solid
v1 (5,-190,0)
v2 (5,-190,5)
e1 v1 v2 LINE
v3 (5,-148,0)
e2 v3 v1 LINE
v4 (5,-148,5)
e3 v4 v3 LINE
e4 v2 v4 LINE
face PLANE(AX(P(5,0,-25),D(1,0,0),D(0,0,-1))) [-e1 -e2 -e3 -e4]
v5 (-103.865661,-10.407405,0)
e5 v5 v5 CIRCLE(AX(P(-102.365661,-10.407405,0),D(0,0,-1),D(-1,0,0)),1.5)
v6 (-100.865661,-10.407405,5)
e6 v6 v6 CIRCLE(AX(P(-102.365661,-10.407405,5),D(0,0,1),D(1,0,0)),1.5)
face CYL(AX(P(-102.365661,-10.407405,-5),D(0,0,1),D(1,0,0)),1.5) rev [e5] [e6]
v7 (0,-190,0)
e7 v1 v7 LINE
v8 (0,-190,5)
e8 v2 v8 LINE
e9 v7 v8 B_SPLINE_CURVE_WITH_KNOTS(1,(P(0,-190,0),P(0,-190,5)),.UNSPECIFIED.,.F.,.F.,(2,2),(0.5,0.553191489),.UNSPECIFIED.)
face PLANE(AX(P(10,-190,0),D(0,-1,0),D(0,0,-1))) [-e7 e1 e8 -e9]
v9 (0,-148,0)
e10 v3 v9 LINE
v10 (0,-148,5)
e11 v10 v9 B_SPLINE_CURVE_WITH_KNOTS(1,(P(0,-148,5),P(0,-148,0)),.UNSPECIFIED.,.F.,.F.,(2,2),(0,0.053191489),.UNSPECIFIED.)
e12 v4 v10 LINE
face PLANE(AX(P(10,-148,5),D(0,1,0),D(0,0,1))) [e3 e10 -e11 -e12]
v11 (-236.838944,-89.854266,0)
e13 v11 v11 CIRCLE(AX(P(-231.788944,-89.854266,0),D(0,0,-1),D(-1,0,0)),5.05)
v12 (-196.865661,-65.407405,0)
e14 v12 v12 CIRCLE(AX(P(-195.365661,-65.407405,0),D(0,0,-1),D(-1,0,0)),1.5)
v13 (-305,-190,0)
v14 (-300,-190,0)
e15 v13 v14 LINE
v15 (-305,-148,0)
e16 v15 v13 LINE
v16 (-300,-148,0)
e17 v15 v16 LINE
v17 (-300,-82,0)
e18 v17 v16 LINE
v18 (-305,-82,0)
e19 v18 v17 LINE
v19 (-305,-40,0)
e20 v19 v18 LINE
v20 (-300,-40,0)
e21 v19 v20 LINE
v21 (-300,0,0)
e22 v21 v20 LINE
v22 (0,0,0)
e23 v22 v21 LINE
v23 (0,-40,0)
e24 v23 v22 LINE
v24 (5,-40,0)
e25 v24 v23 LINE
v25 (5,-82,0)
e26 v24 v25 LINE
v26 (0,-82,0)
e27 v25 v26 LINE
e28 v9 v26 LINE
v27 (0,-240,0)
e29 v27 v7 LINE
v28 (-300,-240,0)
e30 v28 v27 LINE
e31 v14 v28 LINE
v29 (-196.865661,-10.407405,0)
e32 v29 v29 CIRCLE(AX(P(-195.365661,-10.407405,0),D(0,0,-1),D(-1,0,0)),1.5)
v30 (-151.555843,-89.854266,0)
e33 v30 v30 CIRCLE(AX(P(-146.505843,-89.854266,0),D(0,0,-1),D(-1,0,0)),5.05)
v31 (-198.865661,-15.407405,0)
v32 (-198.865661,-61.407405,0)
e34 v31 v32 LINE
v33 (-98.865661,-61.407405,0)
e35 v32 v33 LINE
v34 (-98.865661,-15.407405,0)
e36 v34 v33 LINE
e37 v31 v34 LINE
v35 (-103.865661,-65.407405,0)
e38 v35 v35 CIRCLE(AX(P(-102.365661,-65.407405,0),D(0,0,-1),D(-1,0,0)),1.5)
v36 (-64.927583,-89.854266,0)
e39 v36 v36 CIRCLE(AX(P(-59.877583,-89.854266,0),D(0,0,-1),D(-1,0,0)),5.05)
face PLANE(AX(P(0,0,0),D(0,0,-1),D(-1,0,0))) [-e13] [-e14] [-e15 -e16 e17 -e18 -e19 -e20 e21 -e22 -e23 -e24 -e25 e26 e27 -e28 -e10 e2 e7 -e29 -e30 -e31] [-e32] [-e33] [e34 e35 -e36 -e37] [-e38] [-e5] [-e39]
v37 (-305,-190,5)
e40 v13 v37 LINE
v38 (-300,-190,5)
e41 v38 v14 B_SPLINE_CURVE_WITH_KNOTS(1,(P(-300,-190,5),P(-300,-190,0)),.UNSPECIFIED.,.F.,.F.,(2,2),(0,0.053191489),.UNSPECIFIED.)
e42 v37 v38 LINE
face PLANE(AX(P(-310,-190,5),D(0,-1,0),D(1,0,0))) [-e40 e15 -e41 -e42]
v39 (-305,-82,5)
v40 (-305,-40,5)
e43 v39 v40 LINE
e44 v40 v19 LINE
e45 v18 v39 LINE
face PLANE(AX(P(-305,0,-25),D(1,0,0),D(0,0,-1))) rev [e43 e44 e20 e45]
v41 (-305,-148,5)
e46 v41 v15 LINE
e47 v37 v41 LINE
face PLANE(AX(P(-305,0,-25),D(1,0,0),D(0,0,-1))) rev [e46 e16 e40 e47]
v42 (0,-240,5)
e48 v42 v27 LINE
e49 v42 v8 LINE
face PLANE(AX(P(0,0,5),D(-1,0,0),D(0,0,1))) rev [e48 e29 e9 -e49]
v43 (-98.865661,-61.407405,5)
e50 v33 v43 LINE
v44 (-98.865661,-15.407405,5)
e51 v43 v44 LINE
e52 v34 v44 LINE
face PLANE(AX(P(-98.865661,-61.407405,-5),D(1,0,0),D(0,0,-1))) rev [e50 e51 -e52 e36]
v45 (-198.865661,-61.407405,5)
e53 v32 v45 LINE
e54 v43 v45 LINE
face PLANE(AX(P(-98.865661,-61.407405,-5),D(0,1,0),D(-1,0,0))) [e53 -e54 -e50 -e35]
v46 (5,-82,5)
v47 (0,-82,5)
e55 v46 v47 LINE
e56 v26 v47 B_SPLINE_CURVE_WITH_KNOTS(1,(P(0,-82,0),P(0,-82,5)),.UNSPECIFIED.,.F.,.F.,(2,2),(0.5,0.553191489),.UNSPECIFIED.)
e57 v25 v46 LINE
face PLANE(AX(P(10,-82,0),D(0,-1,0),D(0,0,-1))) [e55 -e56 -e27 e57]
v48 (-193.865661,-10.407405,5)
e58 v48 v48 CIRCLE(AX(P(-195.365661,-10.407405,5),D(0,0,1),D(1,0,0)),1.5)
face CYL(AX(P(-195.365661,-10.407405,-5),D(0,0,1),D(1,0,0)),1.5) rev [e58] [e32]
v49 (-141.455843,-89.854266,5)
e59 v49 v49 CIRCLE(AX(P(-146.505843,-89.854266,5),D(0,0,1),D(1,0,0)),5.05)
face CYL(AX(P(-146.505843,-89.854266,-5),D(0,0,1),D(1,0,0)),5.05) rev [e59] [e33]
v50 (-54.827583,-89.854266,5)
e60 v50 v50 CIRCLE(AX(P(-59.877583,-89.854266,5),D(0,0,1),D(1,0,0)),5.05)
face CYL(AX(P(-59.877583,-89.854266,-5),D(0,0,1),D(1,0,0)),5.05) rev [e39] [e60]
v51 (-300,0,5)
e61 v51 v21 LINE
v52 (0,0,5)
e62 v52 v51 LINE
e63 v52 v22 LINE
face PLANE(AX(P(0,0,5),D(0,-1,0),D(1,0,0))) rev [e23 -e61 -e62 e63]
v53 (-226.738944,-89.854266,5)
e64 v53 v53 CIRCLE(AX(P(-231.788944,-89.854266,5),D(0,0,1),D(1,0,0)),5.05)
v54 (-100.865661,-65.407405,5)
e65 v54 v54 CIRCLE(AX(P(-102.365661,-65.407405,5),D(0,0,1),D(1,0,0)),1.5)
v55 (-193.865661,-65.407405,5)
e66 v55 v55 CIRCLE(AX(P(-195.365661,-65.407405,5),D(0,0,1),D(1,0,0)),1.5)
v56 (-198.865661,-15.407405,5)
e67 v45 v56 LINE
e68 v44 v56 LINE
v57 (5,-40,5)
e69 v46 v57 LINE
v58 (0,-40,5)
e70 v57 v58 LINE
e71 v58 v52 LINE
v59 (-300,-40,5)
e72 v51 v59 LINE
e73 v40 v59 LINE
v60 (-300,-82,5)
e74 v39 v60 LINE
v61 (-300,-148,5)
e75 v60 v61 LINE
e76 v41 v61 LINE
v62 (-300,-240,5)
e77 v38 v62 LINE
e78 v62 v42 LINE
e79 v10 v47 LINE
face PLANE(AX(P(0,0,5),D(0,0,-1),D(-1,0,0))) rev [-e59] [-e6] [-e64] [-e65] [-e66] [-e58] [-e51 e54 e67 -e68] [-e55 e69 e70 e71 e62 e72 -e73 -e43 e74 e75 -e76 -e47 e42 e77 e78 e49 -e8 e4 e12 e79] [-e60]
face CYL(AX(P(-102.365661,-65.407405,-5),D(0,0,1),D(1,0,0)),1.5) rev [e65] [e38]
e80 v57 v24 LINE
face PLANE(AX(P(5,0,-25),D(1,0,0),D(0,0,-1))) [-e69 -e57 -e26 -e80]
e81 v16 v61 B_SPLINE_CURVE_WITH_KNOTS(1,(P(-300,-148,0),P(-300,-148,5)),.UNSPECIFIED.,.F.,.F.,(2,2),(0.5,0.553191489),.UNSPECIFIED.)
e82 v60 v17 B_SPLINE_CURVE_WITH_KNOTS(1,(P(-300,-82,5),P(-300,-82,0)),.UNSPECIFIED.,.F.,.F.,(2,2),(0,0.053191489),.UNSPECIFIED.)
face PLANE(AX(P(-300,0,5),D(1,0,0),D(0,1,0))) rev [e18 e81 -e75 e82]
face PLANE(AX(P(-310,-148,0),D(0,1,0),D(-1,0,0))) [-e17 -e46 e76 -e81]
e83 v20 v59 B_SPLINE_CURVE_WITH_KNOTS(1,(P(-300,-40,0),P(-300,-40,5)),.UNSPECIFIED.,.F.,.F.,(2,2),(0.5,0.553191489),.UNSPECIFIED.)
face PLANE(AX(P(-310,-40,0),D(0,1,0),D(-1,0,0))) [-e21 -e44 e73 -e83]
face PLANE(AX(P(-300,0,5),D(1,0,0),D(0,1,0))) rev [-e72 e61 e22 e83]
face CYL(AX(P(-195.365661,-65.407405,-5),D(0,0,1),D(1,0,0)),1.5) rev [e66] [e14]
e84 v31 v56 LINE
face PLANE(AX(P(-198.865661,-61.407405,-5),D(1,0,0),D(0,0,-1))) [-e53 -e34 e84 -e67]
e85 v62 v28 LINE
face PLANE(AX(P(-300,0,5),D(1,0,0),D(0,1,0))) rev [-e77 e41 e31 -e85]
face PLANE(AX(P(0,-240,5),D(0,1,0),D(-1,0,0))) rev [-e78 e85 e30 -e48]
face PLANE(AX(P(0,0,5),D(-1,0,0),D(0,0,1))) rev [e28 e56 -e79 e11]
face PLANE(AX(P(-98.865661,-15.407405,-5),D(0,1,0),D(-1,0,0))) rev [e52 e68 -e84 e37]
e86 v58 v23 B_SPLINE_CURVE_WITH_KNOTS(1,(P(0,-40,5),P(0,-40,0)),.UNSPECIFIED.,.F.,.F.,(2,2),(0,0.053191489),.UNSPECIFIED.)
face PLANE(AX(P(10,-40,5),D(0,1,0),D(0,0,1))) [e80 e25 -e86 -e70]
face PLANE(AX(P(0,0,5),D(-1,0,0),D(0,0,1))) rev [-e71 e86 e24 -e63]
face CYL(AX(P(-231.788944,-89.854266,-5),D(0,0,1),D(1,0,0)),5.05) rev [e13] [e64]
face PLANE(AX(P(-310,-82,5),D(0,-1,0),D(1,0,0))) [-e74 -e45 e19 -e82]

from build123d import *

# Parameters (mm, degrees)
ESQUISSE1_W                          = 300
ESQUISSE1_H                          = 240
BOSS_EXTRU_1_DEPTH                   = 5
TENON_START                          = -190
TENON_ET_MORTAISE_TENON1_OUTLINE_W   = 5
TENON_ET_MORTAISE_TENON1_OUTLINE_H   = 5
TENON_ET_MORTAISE_TENON1_DEPTH       = 42
TENON_START_2                        = -82
TENON_ET_MORTAISE_TENON1_2_OUTLINE_W = 5
TENON_ET_MORTAISE_TENON1_2_OUTLINE_H = 5
TENON_ET_MORTAISE_TENON1_2_DEPTH     = 42
TENON_ET_MORTAISE_TENON2_OUTLINE_W   = 5
TENON_ET_MORTAISE_TENON2_OUTLINE_H   = 5
TENON_ET_MORTAISE_TENON2_DEPTH       = 42
TENON_ET_MORTAISE_TENON2_2_OUTLINE_W = 5
TENON_ET_MORTAISE_TENON2_2_OUTLINE_H = 5
TENON_ET_MORTAISE_TENON2_2_DEPTH     = 42
ESQUISSE2_R                          = 5.05
ENL_V_MAT_EXTRU_1_DEPTH              = 10
ESQUISSE3_W                          = 100
ESQUISSE3_H                          = 46
ENL_V_MAT_EXTRU_3_DEPTH              = 10
ESQUISSE5_R                          = 1.5
ENL_V_MAT_EXTRU_4_DEPTH              = 10


# Read off the part's stored shape, not the designer's step: Tenon et mortaise-Tenon1, Tenon et mortaise-Tenon2
with BuildPart() as part:
    # Esquisse1 → Boss.-Extru.1 (new body)
    with BuildSketch(Plane.XY):
        with Locations((-150, -120)):
            Rectangle(ESQUISSE1_W, ESQUISSE1_H)
    extrude(amount=BOSS_EXTRU_1_DEPTH)

    # Tenon et mortaise-Tenon1 outline → Tenon et mortaise-Tenon1 (add)
    with BuildSketch(Plane(origin=(0, 0, 0), x_dir=(1, 0, 0), z_dir=(0, 1, 0)).offset(TENON_START)):
        with Locations((-302.5, -2.5)):
            Rectangle(TENON_ET_MORTAISE_TENON1_OUTLINE_W, TENON_ET_MORTAISE_TENON1_OUTLINE_H)
    extrude(amount=TENON_ET_MORTAISE_TENON1_DEPTH)

    # Tenon et mortaise-Tenon1 2 outline → Tenon et mortaise-Tenon1 2 (add)
    with BuildSketch(Plane(origin=(0, 0, 0), x_dir=(1, 0, 0), z_dir=(0, 1, 0)).offset(TENON_START_2)):
        with Locations((-302.5, -2.5)):
            Rectangle(TENON_ET_MORTAISE_TENON1_2_OUTLINE_W, TENON_ET_MORTAISE_TENON1_2_OUTLINE_H)
    extrude(amount=TENON_ET_MORTAISE_TENON1_2_DEPTH)

    # Tenon et mortaise-Tenon2 outline → Tenon et mortaise-Tenon2 (add)
    with BuildSketch(Plane(origin=(0, 0, 0), x_dir=(1, 0, 0), z_dir=(0, 1, 0)).offset(TENON_START)):
        with Locations((2.5, -2.5)):
            Rectangle(TENON_ET_MORTAISE_TENON2_OUTLINE_W, TENON_ET_MORTAISE_TENON2_OUTLINE_H)
    extrude(amount=TENON_ET_MORTAISE_TENON2_DEPTH)

    # Tenon et mortaise-Tenon2 2 outline → Tenon et mortaise-Tenon2 2 (add)
    with BuildSketch(Plane(origin=(0, 0, 0), x_dir=(1, 0, 0), z_dir=(0, 1, 0)).offset(TENON_START_2)):
        with Locations((2.5, -2.5)):
            Rectangle(TENON_ET_MORTAISE_TENON2_2_OUTLINE_W, TENON_ET_MORTAISE_TENON2_2_OUTLINE_H)
    extrude(amount=TENON_ET_MORTAISE_TENON2_2_DEPTH)

    # Esquisse2 → Enlèv. mat.-Extru.1 (cut)
    with BuildSketch(Plane.XY.offset(5)):
        with Locations((-231.788943558, -89.854265633)):
            Circle(ESQUISSE2_R)
        with Locations((-146.505843122, -89.854265633)):
            Circle(ESQUISSE2_R)
        with Locations((-59.877583373, -89.854265633)):
            Circle(ESQUISSE2_R)
    extrude(amount=-ENL_V_MAT_EXTRU_1_DEPTH, mode=Mode.SUBTRACT)

    # Esquisse3 → Enlèv. mat.-Extru.3 (cut)
    with BuildSketch(Plane.XY.offset(5)):
        with Locations((-148.865660617, -38.407404502)):
            Rectangle(ESQUISSE3_W, ESQUISSE3_H)
    extrude(amount=-ENL_V_MAT_EXTRU_3_DEPTH, mode=Mode.SUBTRACT)

    # Esquisse5 → Enlèv. mat.-Extru.4 (cut)
    with BuildSketch(Plane.XY.offset(5)):
        with Locations((-102.365660617, -10.407404502)):
            Circle(ESQUISSE5_R)
        with Locations((-195.365660617, -10.407404502)):
            Circle(ESQUISSE5_R)
        with Locations((-195.365660617, -65.407404502)):
            Circle(ESQUISSE5_R)
        with Locations((-102.365660617, -65.407404502)):
            Circle(ESQUISSE5_R)
    extrude(amount=-ENL_V_MAT_EXTRU_4_DEPTH, mode=Mode.SUBTRACT)


solid = part.part
